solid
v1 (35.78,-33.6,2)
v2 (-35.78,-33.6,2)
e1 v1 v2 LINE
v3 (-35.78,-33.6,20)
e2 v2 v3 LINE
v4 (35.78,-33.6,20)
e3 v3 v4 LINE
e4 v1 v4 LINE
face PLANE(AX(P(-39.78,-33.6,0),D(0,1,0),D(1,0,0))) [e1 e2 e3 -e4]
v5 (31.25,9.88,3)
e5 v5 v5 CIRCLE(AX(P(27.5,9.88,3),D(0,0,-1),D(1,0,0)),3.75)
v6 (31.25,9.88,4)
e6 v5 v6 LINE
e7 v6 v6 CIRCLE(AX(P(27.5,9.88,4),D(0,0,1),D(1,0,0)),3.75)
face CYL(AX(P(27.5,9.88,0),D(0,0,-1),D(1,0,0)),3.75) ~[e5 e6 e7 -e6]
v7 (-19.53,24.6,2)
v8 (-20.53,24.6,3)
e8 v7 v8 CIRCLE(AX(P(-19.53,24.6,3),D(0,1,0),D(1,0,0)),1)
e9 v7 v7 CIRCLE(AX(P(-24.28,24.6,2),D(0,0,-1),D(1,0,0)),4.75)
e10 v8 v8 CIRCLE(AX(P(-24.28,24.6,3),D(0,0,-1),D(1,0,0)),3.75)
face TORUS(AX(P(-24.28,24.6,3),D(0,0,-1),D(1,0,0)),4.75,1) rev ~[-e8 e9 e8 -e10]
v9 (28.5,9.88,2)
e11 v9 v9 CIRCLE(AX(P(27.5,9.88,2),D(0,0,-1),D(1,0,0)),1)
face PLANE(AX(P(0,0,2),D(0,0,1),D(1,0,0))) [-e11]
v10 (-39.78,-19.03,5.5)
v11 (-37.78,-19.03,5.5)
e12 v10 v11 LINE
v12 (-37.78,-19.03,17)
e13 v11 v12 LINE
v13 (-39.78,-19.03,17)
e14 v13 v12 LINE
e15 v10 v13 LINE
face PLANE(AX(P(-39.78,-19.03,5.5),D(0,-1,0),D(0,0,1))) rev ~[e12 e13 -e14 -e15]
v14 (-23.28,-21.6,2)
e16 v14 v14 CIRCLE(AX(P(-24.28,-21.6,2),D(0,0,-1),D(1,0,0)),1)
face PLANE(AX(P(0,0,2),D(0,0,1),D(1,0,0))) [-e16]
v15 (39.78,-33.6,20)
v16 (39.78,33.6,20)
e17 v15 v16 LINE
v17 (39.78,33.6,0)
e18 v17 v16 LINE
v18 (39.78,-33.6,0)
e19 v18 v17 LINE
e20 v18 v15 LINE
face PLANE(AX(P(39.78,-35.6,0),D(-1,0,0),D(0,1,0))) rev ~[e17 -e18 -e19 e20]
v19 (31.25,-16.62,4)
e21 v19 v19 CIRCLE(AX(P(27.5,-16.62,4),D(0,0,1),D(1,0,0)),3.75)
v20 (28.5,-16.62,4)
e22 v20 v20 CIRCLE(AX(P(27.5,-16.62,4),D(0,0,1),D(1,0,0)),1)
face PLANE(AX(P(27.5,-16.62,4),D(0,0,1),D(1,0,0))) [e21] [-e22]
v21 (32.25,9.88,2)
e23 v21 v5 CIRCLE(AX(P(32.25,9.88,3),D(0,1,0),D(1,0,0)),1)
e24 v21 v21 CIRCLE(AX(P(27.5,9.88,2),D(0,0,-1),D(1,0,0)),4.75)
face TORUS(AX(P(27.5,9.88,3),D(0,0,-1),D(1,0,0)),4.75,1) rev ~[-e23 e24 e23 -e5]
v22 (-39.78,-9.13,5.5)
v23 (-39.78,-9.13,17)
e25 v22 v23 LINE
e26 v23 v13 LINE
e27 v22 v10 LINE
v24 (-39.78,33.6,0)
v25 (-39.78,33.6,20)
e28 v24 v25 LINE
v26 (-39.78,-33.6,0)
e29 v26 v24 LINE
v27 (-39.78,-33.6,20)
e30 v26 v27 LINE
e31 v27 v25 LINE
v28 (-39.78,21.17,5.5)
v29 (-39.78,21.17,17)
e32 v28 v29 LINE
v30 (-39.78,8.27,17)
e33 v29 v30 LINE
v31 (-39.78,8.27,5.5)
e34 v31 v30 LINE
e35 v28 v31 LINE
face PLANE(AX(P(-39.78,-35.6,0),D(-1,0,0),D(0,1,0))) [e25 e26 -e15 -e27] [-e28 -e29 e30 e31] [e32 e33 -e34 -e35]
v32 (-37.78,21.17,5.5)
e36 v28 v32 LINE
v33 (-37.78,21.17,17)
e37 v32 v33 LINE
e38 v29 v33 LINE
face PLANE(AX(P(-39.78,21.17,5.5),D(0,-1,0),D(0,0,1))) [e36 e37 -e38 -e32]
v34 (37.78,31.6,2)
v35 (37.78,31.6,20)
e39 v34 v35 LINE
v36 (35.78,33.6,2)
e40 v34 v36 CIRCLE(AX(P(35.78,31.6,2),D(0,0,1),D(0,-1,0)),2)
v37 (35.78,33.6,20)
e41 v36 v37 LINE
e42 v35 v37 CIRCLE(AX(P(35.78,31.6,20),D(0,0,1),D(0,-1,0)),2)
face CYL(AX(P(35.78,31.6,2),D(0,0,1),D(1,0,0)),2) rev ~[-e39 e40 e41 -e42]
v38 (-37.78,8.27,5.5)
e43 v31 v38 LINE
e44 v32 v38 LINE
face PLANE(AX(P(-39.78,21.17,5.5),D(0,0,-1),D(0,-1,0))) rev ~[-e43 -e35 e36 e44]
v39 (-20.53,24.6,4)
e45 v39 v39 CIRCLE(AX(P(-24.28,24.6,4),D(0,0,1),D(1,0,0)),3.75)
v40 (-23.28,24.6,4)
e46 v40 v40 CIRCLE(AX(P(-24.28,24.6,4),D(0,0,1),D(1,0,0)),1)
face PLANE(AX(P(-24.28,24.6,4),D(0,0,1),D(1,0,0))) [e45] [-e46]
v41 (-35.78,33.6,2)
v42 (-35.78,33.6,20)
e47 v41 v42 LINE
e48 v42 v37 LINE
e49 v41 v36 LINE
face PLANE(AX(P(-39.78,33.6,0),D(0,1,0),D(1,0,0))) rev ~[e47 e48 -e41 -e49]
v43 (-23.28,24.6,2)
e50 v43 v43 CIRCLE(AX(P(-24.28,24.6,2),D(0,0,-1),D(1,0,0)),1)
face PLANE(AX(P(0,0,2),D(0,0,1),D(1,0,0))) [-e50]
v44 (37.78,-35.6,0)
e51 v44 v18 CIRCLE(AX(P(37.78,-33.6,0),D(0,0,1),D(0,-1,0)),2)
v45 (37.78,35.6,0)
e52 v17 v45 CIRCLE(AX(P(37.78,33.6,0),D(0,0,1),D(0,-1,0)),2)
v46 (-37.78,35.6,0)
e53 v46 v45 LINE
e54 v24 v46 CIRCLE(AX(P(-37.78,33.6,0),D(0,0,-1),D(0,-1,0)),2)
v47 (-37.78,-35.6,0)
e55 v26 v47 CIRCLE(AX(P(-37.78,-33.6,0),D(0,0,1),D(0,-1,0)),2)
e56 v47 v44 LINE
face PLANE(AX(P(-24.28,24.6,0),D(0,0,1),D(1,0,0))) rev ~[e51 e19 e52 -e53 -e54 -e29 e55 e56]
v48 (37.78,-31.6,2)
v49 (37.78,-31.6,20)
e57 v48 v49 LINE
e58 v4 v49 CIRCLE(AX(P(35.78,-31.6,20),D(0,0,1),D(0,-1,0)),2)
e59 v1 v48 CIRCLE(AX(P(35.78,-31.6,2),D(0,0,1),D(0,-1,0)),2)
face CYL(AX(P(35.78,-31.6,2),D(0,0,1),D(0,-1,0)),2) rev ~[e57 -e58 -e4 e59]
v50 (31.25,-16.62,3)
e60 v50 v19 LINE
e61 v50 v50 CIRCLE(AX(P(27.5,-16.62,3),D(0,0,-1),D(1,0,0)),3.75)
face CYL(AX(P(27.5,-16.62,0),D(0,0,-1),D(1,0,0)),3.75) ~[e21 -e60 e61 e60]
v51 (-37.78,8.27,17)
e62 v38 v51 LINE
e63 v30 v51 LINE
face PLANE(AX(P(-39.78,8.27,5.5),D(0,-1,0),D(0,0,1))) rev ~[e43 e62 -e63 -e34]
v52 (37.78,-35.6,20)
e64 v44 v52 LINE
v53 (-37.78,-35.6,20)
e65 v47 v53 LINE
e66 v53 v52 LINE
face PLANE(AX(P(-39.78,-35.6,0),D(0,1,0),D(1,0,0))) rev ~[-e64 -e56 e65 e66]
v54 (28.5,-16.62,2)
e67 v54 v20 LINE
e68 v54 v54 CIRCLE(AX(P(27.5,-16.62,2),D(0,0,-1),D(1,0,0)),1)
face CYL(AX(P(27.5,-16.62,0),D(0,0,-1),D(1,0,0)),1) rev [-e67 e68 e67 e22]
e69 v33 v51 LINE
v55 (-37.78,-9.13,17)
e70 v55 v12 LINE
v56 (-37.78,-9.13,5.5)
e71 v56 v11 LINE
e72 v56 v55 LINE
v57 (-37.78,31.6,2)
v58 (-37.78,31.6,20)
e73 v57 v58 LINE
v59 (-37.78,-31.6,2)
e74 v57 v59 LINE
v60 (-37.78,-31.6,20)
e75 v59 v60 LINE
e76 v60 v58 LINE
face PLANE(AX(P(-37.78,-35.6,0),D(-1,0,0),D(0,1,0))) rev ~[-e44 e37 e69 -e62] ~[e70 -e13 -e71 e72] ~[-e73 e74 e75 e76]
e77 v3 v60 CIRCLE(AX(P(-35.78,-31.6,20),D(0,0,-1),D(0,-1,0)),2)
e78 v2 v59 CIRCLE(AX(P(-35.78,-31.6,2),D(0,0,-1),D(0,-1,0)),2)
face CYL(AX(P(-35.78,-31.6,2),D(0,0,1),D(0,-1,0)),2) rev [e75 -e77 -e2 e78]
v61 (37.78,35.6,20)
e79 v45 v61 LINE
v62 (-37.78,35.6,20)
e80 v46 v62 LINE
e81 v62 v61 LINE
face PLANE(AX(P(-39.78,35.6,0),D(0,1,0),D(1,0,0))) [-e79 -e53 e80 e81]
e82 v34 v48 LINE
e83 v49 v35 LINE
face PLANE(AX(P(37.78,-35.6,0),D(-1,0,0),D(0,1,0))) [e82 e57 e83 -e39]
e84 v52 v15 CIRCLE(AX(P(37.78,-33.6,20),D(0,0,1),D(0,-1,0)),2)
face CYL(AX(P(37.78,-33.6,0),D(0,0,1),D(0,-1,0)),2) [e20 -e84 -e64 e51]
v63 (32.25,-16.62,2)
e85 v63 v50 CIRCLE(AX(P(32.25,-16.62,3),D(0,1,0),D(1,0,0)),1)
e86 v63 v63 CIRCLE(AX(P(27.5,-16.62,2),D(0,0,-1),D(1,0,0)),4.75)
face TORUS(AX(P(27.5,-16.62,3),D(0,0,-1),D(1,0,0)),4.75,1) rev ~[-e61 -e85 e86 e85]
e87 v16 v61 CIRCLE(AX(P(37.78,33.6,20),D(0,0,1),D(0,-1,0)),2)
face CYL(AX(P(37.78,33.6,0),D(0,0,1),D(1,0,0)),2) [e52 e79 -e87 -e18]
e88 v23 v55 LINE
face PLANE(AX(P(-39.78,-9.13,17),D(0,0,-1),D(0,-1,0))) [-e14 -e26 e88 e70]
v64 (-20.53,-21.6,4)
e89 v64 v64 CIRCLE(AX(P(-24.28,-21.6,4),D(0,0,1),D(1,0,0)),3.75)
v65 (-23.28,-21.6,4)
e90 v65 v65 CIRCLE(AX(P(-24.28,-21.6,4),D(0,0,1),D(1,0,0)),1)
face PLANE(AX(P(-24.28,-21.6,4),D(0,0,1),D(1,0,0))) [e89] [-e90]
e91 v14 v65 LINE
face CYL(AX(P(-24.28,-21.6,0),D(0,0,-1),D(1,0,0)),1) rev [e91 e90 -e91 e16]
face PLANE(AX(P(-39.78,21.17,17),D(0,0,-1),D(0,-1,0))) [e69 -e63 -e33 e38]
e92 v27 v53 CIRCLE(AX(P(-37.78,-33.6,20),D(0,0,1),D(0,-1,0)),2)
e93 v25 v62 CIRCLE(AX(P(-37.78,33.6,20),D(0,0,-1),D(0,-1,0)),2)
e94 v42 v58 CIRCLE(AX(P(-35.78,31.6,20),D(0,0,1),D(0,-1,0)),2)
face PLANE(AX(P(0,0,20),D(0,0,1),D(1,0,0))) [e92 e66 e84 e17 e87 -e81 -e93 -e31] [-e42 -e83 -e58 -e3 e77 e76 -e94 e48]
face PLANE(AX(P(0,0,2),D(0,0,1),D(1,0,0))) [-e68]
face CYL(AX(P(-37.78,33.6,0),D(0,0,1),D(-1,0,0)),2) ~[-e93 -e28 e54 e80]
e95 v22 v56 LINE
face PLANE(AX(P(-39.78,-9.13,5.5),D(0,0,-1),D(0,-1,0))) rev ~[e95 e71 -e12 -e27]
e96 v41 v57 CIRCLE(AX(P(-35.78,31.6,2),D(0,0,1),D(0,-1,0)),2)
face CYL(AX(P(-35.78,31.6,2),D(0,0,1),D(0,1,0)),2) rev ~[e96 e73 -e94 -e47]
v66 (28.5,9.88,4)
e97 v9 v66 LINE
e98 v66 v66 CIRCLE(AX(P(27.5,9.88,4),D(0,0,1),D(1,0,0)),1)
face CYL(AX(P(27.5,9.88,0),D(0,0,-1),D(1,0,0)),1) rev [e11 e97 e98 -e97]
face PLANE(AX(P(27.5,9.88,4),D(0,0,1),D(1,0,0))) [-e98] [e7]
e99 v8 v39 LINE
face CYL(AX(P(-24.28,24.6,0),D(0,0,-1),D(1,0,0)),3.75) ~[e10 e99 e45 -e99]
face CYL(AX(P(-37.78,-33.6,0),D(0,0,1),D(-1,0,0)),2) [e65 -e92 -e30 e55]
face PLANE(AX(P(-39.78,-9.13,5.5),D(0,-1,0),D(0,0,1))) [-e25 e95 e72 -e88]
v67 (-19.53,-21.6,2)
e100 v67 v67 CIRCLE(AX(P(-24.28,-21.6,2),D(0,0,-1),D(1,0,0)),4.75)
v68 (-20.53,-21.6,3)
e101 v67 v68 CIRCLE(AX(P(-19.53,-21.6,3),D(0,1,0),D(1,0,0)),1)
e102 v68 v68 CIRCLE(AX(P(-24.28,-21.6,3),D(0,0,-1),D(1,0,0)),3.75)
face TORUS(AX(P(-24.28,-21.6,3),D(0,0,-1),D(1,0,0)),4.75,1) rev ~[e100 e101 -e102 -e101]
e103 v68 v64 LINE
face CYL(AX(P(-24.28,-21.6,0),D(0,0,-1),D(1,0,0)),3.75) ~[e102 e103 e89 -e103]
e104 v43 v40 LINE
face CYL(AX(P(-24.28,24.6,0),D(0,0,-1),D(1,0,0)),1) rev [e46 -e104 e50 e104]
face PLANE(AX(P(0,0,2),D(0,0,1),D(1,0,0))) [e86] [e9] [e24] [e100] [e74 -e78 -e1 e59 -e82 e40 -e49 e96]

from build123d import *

# Parameters (mm, degrees)
F0_W      = 79.56
F0_H      = 71.2
F1_DEPTH  = 20
F3_R      = 2
F5_T      = 2
F6_R      = 2
F7_W      = 12.9
F7_H      = 11.5
F8_DEPTH  = 2
F9_W      = 9.9
F9_H      = 11.5
F10_DEPTH = 2
F11_R     = 3.75
F11_R_2   = 1
F12_DEPTH = 4
F13_R     = 1


# Not quite as in the source:
# - a shell that OpenCascade refuses in one call is made with other operations: the cavity is built on its own and cut out


with BuildPart() as f1:
    # F0 (on Top) → F1 (new body)
    with BuildSketch(Plane.XY):
        Rectangle(F0_W, F0_H)
    extrude(amount=F1_DEPTH)

    # F3
    f3_edges = [f1.edges().sort_by_distance(p)[0] for p in [
        (39.78, -35.6, 10),
        (39.78, 35.6, 10),
        (-39.78, 35.6, 10),
        (-39.78, -35.6, 10),
    ]]
    fillet(f3_edges, radius=F3_R)

    # F5: shell of thickness 2, made by hand


with BuildPart() as f5_core1:
    # F5_t2: copy of F1
    add(f1.part)

    # the walls: a layer under each face that stays
    f5_faces = [f5_core1.faces().sort_by_distance(p)[0] for p in [
        (0, 35.6, 10),
        (0, 0, 0),
        (39.78, 0, 10),
        (-39.78, 0, 10),
        (0, -35.6, 10),
    ]]
    thicken(f5_faces, amount=-F5_T, mode=Mode.SUBTRACT)


with BuildPart() as f1_1:
    add(f1.part)

    # what is left inside the walls is the cavity
    f5_cavity = [f5_core1.part.solids().sort_by_distance(p)[0] for p in [
        (0, -11.2, 2.02),
    ]]
    add(f5_cavity, mode=Mode.SUBTRACT)

    # F6
    f6_edges = [f1_1.edges().sort_by_distance(p)[0] for p in [
        (-37.78, 33.6, 11),
        (37.78, 33.6, 11),
        (-37.78, -33.6, 11),
        (37.78, -33.6, 11),
    ]]
    fillet(f6_edges, radius=F6_R)

    # F7 (on face) → F8 (cut)
    with BuildSketch(Plane(origin=(-39.78, 0, 0), x_dir=(0, -1, 0), z_dir=(-1, 0, 0))):
        with Locations((-14.72, 11.25)):
            Rectangle(F7_W, F7_H)
    extrude(amount=-F8_DEPTH, mode=Mode.SUBTRACT)

    # F9 (on face) → F10 (cut)
    with BuildSketch(Plane(origin=(-39.78, 0, 0), x_dir=(0, -1, 0), z_dir=(-1, 0, 0))):
        with Locations((14.08, 11.25)):
            Rectangle(F9_W, F9_H)
    extrude(amount=-F10_DEPTH, mode=Mode.SUBTRACT)

    # F11 (on Top) → F12 (join)
    with BuildSketch(Plane.XY):
        with Locations((-24.28, 24.6)):
            Circle(F11_R)
        with Locations((-24.28, 24.6)):
            Circle(F11_R_2, mode=Mode.SUBTRACT)
        with Locations((27.5, 9.88)):
            Circle(F11_R)
        with Locations((27.5, 9.88)):
            Circle(F11_R_2, mode=Mode.SUBTRACT)
        with Locations((-24.28, -21.6)):
            Circle(F11_R)
        with Locations((-24.28, -21.6)):
            Circle(F11_R_2, mode=Mode.SUBTRACT)
        with Locations((27.5, -16.62)):
            Circle(F11_R)
        with Locations((27.5, -16.62)):
            Circle(F11_R_2, mode=Mode.SUBTRACT)
    extrude(amount=F12_DEPTH)

    # F13
    f13_edges = [f1_1.edges().sort_by_distance(p)[0] for p in [
        (-28.03, 24.6, 2),
        (-28.03, -21.6, 2),
        (23.75, 9.88, 2),
        (23.75, -16.62, 2),
    ]]
    fillet(f13_edges, radius=F13_R)


solid = f1_1.part
